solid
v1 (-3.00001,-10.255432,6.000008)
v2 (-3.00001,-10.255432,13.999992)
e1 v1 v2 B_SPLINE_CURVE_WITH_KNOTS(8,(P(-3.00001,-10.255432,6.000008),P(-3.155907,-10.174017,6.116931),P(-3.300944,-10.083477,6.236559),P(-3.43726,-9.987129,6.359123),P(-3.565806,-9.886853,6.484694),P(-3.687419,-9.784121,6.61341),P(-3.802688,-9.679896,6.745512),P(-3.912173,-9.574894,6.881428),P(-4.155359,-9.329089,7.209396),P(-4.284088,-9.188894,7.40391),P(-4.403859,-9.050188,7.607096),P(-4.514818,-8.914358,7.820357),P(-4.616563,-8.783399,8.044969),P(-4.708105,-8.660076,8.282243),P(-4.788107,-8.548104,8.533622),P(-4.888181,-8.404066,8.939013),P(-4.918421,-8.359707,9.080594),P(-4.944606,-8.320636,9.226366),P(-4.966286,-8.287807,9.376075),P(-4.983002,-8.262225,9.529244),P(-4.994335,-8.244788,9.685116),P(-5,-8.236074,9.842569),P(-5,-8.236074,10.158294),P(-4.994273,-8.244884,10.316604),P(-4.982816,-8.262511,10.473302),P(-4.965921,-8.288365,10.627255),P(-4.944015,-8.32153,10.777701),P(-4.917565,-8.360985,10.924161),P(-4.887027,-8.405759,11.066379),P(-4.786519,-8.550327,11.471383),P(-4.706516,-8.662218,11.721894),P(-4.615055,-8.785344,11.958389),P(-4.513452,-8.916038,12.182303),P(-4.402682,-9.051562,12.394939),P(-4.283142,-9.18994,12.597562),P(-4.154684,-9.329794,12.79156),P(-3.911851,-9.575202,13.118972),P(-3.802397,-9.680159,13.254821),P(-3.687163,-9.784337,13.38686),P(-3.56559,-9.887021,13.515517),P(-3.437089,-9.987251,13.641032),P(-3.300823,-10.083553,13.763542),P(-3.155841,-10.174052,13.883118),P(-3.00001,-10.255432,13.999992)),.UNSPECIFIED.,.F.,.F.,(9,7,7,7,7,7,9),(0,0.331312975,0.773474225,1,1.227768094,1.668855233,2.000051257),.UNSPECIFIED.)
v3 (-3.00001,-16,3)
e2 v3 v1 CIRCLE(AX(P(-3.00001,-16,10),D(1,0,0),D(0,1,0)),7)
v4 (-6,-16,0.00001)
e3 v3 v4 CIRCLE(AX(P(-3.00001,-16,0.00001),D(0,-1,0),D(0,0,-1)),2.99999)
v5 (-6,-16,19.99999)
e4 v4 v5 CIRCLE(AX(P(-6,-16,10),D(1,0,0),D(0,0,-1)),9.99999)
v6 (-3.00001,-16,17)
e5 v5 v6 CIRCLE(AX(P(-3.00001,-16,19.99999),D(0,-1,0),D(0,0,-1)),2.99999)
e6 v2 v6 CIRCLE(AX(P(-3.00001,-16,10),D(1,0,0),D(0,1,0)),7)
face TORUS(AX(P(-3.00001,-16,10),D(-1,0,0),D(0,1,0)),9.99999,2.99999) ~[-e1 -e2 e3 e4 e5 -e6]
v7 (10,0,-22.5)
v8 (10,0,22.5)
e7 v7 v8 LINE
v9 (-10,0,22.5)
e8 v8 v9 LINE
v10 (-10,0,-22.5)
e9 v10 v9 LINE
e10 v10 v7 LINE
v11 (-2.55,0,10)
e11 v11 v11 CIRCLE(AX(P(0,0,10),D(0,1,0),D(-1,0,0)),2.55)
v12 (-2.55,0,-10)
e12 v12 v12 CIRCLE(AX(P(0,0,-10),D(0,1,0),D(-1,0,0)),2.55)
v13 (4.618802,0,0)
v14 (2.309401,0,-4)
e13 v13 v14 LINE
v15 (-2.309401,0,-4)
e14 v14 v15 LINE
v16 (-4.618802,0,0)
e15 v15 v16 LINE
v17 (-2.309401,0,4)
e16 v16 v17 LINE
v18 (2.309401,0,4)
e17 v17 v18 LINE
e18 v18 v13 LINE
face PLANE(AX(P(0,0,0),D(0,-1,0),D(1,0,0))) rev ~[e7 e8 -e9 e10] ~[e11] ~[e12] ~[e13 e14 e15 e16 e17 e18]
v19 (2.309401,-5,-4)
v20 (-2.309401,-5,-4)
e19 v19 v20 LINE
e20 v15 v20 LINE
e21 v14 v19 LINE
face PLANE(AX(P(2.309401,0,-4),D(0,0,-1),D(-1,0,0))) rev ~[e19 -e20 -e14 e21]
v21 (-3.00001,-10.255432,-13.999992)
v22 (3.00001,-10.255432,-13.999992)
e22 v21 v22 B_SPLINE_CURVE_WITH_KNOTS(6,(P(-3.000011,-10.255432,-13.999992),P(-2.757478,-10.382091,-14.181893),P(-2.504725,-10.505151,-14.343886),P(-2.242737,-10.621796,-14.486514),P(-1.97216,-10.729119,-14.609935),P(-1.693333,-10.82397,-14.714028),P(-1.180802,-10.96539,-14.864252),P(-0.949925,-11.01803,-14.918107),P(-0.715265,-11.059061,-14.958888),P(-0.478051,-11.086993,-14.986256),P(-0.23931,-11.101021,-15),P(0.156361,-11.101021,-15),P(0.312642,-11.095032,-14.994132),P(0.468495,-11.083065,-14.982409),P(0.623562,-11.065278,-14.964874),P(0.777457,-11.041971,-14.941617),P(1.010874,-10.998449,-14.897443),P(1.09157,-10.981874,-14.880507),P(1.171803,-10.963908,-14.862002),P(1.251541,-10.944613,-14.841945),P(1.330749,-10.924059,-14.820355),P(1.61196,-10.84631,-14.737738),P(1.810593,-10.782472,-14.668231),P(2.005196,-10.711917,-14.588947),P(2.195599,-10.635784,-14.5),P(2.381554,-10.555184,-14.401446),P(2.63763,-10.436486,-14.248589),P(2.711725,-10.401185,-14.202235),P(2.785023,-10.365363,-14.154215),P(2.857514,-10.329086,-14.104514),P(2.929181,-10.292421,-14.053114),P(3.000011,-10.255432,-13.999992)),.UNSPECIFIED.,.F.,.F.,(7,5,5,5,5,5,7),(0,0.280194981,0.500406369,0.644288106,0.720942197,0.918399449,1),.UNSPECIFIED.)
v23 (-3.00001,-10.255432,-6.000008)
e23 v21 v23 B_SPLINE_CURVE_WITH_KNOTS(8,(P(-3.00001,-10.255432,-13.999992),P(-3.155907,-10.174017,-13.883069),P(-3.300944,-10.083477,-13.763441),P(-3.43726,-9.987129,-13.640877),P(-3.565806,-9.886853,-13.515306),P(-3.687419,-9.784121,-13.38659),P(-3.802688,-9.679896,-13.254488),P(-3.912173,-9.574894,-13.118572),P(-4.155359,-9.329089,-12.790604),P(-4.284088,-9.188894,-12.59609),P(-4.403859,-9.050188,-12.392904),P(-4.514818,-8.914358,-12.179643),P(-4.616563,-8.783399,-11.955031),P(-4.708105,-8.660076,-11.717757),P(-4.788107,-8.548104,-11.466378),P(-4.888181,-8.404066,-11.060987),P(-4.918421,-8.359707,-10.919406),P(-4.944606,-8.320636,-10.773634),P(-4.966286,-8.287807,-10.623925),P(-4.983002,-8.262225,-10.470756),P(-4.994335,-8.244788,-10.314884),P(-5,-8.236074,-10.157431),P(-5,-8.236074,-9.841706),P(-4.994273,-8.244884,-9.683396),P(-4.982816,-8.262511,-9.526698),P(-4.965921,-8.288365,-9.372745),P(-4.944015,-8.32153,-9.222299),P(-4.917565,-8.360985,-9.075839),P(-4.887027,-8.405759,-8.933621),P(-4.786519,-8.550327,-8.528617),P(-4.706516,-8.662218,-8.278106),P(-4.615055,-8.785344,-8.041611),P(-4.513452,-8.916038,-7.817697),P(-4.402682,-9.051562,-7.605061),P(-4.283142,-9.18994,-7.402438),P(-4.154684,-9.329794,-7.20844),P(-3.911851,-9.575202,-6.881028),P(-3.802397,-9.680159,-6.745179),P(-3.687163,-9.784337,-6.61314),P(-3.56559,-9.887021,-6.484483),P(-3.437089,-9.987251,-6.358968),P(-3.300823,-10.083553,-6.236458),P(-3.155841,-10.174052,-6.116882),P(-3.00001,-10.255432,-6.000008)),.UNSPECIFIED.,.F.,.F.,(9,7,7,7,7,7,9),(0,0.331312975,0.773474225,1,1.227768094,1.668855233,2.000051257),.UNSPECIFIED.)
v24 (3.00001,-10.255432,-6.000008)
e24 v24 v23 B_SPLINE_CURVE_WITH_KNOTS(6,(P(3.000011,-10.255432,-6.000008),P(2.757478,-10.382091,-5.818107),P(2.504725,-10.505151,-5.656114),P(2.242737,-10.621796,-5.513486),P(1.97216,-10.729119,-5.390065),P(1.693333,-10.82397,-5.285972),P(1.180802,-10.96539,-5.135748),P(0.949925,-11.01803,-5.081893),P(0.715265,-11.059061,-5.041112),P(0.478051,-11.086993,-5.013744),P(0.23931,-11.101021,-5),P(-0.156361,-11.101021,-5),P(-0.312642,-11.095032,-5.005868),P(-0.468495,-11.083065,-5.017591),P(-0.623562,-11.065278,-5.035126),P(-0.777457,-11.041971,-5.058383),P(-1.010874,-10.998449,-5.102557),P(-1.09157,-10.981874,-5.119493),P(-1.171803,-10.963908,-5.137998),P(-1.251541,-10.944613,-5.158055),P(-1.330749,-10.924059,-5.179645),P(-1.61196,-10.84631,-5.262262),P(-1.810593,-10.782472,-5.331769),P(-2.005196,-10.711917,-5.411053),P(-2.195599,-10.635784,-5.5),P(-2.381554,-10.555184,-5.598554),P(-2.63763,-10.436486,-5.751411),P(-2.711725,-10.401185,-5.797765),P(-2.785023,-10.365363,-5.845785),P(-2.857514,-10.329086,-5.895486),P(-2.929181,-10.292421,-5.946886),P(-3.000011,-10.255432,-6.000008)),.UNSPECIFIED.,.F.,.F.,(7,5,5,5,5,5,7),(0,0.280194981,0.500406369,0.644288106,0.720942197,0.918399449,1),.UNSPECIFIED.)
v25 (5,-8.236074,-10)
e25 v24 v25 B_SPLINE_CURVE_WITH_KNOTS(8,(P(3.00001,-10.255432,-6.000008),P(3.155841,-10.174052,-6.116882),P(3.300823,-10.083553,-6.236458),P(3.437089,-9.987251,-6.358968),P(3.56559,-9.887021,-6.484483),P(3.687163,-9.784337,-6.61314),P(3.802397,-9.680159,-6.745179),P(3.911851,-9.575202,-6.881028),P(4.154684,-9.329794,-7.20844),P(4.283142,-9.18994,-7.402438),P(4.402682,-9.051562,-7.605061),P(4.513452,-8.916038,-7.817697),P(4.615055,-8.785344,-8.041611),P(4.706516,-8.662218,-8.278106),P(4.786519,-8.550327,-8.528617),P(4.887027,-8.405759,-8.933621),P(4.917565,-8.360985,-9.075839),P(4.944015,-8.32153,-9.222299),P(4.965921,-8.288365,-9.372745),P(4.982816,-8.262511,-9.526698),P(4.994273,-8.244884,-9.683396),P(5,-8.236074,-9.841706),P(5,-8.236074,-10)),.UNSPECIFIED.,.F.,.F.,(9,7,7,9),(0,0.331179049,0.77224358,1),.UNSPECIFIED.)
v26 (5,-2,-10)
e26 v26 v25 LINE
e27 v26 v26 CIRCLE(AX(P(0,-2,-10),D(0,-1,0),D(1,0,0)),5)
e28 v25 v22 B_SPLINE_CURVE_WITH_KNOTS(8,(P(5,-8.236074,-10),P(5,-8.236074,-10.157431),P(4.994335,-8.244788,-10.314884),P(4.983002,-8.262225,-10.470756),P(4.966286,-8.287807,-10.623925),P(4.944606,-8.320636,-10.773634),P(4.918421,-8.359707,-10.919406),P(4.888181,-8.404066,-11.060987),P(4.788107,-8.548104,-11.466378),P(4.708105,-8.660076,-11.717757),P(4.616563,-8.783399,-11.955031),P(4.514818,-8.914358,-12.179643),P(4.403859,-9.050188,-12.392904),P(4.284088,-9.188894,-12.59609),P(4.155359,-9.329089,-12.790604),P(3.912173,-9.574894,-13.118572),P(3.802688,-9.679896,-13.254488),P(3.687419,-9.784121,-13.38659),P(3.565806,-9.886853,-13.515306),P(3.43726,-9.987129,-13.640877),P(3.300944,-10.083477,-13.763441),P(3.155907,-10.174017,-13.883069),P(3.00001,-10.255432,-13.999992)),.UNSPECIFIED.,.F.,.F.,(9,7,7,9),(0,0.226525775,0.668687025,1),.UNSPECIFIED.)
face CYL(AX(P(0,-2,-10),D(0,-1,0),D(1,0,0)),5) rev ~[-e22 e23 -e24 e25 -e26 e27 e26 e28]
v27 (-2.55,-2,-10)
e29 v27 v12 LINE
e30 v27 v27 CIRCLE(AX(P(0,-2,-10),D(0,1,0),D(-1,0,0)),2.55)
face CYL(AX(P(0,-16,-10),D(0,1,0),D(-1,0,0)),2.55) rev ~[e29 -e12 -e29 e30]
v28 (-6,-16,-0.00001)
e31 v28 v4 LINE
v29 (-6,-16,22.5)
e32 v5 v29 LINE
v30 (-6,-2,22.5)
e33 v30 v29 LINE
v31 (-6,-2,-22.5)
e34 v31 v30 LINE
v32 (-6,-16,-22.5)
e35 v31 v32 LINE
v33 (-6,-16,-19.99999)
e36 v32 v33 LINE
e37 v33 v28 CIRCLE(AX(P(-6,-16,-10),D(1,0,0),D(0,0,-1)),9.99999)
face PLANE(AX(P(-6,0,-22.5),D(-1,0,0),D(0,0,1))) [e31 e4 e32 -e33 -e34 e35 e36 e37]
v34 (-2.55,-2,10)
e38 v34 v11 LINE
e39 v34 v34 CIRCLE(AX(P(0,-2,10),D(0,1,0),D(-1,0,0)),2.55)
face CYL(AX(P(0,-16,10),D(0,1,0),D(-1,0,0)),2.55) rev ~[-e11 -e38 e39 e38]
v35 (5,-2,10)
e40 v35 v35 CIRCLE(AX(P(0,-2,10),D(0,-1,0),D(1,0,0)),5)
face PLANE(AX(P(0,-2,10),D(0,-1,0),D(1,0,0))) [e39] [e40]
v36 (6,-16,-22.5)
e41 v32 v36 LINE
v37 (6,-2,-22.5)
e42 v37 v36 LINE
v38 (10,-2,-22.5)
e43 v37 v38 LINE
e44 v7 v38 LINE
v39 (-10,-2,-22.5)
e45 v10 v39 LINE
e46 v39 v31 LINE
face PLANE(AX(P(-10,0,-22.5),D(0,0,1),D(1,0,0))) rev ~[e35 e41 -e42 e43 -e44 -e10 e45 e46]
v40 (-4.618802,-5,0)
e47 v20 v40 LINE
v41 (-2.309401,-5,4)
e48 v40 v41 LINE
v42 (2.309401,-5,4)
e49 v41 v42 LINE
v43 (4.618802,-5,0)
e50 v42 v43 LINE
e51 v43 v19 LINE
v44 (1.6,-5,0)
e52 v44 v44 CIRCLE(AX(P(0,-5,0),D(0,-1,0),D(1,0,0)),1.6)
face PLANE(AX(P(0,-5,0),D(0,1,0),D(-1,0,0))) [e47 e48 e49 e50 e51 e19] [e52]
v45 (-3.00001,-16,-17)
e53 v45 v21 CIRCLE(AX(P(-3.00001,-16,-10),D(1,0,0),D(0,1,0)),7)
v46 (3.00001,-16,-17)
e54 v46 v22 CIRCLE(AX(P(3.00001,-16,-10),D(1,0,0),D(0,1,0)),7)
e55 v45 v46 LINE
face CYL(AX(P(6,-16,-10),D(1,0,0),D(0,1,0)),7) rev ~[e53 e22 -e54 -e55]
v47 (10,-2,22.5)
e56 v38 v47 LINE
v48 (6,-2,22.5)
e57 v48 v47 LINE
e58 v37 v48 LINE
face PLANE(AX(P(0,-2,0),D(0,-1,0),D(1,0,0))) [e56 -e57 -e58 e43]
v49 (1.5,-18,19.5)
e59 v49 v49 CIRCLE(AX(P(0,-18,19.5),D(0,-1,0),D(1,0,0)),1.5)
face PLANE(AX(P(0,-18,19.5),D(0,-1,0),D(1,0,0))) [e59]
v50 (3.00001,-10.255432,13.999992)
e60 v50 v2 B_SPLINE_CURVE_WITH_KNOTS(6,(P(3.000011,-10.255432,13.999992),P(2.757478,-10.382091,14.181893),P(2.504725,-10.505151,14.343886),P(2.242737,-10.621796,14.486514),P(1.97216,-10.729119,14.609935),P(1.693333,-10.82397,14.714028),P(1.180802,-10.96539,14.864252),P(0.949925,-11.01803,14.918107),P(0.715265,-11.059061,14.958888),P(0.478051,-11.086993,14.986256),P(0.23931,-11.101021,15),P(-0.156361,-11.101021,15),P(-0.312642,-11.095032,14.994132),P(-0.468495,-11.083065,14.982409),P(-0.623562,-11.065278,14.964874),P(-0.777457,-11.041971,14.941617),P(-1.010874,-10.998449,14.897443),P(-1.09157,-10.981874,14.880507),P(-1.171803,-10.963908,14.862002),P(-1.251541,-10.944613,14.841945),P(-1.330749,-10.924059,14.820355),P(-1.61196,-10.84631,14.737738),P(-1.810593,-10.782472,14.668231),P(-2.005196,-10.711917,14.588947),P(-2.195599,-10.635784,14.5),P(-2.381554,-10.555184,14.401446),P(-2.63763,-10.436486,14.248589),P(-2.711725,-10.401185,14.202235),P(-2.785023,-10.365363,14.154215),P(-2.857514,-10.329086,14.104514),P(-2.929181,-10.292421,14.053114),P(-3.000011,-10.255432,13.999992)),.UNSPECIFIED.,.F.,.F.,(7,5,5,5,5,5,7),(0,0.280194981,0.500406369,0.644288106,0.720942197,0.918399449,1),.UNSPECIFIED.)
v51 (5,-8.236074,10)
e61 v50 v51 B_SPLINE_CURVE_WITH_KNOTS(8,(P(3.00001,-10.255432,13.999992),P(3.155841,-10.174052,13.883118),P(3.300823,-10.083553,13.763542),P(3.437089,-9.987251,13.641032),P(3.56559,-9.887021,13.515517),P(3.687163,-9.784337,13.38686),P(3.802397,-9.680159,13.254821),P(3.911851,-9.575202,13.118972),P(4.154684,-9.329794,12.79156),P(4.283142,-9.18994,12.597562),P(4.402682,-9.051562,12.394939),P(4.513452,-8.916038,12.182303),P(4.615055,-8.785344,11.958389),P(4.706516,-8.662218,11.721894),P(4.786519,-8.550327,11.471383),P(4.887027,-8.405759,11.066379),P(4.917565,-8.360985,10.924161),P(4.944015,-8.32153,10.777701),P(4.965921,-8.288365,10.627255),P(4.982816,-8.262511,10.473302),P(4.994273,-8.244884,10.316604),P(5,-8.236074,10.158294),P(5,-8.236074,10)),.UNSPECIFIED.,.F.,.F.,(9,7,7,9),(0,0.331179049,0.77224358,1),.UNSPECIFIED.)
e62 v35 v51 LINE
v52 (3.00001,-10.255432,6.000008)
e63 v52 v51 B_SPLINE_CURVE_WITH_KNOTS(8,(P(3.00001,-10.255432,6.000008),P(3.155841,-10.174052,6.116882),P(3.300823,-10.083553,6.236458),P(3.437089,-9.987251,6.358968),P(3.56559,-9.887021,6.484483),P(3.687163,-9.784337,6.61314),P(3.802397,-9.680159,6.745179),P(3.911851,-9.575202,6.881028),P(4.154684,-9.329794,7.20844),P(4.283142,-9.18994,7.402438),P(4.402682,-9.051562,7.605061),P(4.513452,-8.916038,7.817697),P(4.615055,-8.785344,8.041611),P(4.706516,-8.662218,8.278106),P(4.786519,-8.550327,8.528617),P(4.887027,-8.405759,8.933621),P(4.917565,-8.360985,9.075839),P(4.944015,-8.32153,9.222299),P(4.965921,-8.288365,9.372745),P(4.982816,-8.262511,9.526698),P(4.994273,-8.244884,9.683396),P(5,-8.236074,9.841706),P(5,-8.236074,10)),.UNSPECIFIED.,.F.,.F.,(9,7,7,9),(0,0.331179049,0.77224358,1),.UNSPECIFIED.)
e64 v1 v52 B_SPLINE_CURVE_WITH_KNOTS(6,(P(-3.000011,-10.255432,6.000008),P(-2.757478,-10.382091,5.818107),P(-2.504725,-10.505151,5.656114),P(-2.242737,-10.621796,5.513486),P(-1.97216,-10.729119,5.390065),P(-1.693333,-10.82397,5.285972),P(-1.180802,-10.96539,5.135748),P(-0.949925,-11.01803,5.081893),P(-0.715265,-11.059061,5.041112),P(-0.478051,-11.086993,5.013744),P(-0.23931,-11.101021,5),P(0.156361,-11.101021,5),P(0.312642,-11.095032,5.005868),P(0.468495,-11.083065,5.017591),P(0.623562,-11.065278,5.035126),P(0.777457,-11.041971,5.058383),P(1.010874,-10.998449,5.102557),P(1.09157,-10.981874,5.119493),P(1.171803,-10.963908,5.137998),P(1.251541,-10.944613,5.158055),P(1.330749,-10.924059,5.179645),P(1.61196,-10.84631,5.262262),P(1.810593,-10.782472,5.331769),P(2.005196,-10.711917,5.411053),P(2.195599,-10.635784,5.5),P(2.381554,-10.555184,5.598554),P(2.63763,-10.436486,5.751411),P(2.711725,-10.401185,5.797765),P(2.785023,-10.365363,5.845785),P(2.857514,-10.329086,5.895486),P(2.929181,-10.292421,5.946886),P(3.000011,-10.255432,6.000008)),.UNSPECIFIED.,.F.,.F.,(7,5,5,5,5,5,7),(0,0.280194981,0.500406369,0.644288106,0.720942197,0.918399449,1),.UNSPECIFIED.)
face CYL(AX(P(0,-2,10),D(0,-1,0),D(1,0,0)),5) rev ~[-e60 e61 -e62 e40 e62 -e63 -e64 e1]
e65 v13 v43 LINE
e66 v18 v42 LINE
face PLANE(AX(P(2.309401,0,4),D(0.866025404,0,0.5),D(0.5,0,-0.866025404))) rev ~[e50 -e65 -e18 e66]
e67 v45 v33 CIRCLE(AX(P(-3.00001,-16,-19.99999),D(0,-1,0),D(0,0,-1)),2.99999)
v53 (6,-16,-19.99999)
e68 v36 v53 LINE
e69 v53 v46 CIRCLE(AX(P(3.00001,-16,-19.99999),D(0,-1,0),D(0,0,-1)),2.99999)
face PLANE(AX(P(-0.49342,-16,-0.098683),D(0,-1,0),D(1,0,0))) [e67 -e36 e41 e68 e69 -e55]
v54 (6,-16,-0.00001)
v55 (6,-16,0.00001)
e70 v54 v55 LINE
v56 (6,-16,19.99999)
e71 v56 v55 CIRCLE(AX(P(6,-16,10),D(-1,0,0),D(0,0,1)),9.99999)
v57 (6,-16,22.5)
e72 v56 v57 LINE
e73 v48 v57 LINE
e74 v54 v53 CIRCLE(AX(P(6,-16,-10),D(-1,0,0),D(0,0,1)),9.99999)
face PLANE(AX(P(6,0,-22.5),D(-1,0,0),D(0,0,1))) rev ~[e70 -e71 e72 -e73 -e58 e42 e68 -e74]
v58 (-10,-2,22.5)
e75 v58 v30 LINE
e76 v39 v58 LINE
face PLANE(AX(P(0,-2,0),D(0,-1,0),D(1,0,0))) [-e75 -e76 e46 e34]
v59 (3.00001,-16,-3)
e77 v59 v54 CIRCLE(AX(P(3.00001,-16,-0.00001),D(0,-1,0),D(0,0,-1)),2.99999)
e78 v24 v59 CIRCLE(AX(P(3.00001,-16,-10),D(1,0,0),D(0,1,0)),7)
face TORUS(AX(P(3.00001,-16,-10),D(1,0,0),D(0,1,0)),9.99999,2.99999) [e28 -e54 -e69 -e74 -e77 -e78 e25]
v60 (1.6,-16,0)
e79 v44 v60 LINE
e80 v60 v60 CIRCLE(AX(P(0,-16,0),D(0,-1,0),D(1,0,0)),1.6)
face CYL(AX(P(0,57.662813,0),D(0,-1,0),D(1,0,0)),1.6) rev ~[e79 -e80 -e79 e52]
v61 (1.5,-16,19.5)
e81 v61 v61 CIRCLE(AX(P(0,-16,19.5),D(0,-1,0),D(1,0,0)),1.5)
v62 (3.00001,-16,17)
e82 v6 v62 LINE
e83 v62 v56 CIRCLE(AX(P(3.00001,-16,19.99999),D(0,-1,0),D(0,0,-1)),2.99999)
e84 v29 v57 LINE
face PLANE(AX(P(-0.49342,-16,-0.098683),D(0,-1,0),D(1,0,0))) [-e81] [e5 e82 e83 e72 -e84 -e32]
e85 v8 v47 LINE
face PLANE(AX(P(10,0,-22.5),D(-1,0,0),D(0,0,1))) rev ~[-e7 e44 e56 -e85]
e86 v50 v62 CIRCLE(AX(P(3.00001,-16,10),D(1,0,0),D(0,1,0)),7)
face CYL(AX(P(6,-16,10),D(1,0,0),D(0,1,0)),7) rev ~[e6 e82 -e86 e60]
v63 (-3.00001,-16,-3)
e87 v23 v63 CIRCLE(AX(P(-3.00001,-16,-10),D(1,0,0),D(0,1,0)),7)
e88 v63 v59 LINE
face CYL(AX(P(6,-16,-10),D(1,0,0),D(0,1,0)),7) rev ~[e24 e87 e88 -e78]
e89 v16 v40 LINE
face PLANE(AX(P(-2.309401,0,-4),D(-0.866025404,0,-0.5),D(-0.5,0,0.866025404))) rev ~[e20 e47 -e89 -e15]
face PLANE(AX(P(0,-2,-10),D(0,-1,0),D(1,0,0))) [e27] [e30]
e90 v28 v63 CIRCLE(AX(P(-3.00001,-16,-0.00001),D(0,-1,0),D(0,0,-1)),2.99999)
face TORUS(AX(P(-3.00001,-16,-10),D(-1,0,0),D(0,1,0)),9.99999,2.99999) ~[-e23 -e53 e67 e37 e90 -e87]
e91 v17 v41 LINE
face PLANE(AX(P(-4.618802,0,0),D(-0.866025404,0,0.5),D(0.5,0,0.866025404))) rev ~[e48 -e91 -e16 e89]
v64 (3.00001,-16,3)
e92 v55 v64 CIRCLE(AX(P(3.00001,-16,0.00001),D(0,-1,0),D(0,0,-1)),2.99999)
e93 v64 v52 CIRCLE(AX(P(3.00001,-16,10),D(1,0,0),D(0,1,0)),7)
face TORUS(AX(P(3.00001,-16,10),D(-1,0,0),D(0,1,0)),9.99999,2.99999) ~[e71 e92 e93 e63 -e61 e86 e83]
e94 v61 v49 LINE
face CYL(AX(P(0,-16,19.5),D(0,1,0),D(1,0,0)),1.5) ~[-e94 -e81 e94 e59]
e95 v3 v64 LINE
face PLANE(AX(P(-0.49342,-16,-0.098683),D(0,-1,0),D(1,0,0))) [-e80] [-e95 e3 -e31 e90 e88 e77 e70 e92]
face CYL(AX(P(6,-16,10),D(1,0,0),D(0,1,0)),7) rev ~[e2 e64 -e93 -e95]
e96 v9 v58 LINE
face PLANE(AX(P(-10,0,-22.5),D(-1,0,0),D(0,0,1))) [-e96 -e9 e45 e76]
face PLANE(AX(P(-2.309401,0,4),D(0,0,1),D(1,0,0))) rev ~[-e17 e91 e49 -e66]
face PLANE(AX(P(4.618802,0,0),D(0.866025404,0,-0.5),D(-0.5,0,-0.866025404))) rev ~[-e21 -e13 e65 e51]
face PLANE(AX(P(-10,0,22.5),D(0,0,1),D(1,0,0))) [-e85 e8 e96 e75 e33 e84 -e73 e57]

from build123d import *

# Parameters (mm, degrees)
F1_W            = 12
F1_H            = 45
F2_DEPTH        = 30
F3_R            = 7
F4_DEPTH        = 12.001
F5_W            = 20
F5_H            = 45
F6_DEPTH        = 2
F7_R            = 2.99999
F9_D            = 3.2
F11_SIZE        = 1
F13_D           = 5.1
F13_CBORE_D     = 10
F13_CBORE_DEPTH = 14
F15_DEPTH       = 5
F16_W           = 41.8421067297
F16_H           = 67.5000026822
F17_DEPTH       = 25
F18_R           = 1.5
F19_DEPTH       = 2


# Not quite as in the source:
# - a fillet or chamfer is up to 0.001 mm smaller than in the source, because OpenCascade refuses the exact size


with BuildPart() as f2:
    # F1 (on Front) → F2 (new body)
    with BuildSketch(Plane.XZ):
        Rectangle(F1_W, F1_H)
    extrude(amount=F2_DEPTH)

    # F3 (on face) → F4 (cut, through all)
    with BuildSketch(Plane.YZ.offset(6)):
        with Locations((-16, 10)):
            Circle(F3_R)
        with Locations((-16, -10)):
            Circle(F3_R)
    extrude(amount=-F4_DEPTH, mode=Mode.SUBTRACT)

    # F5 (on Front) → F6 (join)
    with BuildSketch(Plane.XZ):
        Rectangle(F5_W, F5_H)
    extrude(amount=F6_DEPTH)

    # F7 (radius 3 in the source; OpenCascade refuses exactly that, so slightly less here)
    f7_edges = [f2.edges().sort_by_distance(p)[0] for p in [
        (-6, -23, 10),
        (-6, -23, -10),
        (6, -23, 10),
        (6, -23, -10),
    ]]
    fillet(f7_edges, radius=F7_R)

    # F9 (through all)
    with Locations(Plane(origin=(0, 0, 0), x_dir=(-1, 0, 0), z_dir=(0, 1, 0))):
        with Locations((0, 10), (0, -10), (0, 0)):
            Hole(F9_D / 2)

    # F11
    f11_edges = [f2.edges().sort_by_distance(p)[0] for p in [
        (0, -30, -22.5),
        (0, -30, 22.5),
    ]]
    chamfer(f11_edges, length=F11_SIZE)

    # F13 (through all)
    with Locations(Plane.XZ.offset(16)):
        with Locations((0, -10), (0, 10)):
            CounterBoreHole(F13_D / 2, F13_CBORE_D / 2, F13_CBORE_DEPTH)

    # F14 (on face) → F15 (cut)
    with BuildSketch(Plane(origin=(0, 0, 0), x_dir=(-1, 0, 0), z_dir=(0, 1, 0))):
        Polygon((2.3094010768, -4), (4.6188021535, 0), (2.3094010768, 4), (-2.3094010768, 4), (-4.6188021535, 0), (-2.3094010768, -4), align=None)
    extrude(amount=-F15_DEPTH, mode=Mode.SUBTRACT)

    # F16 (on offset) → F17 (cut)
    with BuildSketch(Plane.XZ.offset(16)):
        with Locations((-0.493420288, -0.09868294)):
            Rectangle(F16_W, F16_H)
    extrude(amount=F17_DEPTH, mode=Mode.SUBTRACT)

    # F18 (on face) → F19 (join)
    with BuildSketch(Plane.XZ.offset(16)):
        with Locations((0, 19.5)):
            Circle(F18_R)
    extrude(amount=F19_DEPTH)


solid = f2.part
